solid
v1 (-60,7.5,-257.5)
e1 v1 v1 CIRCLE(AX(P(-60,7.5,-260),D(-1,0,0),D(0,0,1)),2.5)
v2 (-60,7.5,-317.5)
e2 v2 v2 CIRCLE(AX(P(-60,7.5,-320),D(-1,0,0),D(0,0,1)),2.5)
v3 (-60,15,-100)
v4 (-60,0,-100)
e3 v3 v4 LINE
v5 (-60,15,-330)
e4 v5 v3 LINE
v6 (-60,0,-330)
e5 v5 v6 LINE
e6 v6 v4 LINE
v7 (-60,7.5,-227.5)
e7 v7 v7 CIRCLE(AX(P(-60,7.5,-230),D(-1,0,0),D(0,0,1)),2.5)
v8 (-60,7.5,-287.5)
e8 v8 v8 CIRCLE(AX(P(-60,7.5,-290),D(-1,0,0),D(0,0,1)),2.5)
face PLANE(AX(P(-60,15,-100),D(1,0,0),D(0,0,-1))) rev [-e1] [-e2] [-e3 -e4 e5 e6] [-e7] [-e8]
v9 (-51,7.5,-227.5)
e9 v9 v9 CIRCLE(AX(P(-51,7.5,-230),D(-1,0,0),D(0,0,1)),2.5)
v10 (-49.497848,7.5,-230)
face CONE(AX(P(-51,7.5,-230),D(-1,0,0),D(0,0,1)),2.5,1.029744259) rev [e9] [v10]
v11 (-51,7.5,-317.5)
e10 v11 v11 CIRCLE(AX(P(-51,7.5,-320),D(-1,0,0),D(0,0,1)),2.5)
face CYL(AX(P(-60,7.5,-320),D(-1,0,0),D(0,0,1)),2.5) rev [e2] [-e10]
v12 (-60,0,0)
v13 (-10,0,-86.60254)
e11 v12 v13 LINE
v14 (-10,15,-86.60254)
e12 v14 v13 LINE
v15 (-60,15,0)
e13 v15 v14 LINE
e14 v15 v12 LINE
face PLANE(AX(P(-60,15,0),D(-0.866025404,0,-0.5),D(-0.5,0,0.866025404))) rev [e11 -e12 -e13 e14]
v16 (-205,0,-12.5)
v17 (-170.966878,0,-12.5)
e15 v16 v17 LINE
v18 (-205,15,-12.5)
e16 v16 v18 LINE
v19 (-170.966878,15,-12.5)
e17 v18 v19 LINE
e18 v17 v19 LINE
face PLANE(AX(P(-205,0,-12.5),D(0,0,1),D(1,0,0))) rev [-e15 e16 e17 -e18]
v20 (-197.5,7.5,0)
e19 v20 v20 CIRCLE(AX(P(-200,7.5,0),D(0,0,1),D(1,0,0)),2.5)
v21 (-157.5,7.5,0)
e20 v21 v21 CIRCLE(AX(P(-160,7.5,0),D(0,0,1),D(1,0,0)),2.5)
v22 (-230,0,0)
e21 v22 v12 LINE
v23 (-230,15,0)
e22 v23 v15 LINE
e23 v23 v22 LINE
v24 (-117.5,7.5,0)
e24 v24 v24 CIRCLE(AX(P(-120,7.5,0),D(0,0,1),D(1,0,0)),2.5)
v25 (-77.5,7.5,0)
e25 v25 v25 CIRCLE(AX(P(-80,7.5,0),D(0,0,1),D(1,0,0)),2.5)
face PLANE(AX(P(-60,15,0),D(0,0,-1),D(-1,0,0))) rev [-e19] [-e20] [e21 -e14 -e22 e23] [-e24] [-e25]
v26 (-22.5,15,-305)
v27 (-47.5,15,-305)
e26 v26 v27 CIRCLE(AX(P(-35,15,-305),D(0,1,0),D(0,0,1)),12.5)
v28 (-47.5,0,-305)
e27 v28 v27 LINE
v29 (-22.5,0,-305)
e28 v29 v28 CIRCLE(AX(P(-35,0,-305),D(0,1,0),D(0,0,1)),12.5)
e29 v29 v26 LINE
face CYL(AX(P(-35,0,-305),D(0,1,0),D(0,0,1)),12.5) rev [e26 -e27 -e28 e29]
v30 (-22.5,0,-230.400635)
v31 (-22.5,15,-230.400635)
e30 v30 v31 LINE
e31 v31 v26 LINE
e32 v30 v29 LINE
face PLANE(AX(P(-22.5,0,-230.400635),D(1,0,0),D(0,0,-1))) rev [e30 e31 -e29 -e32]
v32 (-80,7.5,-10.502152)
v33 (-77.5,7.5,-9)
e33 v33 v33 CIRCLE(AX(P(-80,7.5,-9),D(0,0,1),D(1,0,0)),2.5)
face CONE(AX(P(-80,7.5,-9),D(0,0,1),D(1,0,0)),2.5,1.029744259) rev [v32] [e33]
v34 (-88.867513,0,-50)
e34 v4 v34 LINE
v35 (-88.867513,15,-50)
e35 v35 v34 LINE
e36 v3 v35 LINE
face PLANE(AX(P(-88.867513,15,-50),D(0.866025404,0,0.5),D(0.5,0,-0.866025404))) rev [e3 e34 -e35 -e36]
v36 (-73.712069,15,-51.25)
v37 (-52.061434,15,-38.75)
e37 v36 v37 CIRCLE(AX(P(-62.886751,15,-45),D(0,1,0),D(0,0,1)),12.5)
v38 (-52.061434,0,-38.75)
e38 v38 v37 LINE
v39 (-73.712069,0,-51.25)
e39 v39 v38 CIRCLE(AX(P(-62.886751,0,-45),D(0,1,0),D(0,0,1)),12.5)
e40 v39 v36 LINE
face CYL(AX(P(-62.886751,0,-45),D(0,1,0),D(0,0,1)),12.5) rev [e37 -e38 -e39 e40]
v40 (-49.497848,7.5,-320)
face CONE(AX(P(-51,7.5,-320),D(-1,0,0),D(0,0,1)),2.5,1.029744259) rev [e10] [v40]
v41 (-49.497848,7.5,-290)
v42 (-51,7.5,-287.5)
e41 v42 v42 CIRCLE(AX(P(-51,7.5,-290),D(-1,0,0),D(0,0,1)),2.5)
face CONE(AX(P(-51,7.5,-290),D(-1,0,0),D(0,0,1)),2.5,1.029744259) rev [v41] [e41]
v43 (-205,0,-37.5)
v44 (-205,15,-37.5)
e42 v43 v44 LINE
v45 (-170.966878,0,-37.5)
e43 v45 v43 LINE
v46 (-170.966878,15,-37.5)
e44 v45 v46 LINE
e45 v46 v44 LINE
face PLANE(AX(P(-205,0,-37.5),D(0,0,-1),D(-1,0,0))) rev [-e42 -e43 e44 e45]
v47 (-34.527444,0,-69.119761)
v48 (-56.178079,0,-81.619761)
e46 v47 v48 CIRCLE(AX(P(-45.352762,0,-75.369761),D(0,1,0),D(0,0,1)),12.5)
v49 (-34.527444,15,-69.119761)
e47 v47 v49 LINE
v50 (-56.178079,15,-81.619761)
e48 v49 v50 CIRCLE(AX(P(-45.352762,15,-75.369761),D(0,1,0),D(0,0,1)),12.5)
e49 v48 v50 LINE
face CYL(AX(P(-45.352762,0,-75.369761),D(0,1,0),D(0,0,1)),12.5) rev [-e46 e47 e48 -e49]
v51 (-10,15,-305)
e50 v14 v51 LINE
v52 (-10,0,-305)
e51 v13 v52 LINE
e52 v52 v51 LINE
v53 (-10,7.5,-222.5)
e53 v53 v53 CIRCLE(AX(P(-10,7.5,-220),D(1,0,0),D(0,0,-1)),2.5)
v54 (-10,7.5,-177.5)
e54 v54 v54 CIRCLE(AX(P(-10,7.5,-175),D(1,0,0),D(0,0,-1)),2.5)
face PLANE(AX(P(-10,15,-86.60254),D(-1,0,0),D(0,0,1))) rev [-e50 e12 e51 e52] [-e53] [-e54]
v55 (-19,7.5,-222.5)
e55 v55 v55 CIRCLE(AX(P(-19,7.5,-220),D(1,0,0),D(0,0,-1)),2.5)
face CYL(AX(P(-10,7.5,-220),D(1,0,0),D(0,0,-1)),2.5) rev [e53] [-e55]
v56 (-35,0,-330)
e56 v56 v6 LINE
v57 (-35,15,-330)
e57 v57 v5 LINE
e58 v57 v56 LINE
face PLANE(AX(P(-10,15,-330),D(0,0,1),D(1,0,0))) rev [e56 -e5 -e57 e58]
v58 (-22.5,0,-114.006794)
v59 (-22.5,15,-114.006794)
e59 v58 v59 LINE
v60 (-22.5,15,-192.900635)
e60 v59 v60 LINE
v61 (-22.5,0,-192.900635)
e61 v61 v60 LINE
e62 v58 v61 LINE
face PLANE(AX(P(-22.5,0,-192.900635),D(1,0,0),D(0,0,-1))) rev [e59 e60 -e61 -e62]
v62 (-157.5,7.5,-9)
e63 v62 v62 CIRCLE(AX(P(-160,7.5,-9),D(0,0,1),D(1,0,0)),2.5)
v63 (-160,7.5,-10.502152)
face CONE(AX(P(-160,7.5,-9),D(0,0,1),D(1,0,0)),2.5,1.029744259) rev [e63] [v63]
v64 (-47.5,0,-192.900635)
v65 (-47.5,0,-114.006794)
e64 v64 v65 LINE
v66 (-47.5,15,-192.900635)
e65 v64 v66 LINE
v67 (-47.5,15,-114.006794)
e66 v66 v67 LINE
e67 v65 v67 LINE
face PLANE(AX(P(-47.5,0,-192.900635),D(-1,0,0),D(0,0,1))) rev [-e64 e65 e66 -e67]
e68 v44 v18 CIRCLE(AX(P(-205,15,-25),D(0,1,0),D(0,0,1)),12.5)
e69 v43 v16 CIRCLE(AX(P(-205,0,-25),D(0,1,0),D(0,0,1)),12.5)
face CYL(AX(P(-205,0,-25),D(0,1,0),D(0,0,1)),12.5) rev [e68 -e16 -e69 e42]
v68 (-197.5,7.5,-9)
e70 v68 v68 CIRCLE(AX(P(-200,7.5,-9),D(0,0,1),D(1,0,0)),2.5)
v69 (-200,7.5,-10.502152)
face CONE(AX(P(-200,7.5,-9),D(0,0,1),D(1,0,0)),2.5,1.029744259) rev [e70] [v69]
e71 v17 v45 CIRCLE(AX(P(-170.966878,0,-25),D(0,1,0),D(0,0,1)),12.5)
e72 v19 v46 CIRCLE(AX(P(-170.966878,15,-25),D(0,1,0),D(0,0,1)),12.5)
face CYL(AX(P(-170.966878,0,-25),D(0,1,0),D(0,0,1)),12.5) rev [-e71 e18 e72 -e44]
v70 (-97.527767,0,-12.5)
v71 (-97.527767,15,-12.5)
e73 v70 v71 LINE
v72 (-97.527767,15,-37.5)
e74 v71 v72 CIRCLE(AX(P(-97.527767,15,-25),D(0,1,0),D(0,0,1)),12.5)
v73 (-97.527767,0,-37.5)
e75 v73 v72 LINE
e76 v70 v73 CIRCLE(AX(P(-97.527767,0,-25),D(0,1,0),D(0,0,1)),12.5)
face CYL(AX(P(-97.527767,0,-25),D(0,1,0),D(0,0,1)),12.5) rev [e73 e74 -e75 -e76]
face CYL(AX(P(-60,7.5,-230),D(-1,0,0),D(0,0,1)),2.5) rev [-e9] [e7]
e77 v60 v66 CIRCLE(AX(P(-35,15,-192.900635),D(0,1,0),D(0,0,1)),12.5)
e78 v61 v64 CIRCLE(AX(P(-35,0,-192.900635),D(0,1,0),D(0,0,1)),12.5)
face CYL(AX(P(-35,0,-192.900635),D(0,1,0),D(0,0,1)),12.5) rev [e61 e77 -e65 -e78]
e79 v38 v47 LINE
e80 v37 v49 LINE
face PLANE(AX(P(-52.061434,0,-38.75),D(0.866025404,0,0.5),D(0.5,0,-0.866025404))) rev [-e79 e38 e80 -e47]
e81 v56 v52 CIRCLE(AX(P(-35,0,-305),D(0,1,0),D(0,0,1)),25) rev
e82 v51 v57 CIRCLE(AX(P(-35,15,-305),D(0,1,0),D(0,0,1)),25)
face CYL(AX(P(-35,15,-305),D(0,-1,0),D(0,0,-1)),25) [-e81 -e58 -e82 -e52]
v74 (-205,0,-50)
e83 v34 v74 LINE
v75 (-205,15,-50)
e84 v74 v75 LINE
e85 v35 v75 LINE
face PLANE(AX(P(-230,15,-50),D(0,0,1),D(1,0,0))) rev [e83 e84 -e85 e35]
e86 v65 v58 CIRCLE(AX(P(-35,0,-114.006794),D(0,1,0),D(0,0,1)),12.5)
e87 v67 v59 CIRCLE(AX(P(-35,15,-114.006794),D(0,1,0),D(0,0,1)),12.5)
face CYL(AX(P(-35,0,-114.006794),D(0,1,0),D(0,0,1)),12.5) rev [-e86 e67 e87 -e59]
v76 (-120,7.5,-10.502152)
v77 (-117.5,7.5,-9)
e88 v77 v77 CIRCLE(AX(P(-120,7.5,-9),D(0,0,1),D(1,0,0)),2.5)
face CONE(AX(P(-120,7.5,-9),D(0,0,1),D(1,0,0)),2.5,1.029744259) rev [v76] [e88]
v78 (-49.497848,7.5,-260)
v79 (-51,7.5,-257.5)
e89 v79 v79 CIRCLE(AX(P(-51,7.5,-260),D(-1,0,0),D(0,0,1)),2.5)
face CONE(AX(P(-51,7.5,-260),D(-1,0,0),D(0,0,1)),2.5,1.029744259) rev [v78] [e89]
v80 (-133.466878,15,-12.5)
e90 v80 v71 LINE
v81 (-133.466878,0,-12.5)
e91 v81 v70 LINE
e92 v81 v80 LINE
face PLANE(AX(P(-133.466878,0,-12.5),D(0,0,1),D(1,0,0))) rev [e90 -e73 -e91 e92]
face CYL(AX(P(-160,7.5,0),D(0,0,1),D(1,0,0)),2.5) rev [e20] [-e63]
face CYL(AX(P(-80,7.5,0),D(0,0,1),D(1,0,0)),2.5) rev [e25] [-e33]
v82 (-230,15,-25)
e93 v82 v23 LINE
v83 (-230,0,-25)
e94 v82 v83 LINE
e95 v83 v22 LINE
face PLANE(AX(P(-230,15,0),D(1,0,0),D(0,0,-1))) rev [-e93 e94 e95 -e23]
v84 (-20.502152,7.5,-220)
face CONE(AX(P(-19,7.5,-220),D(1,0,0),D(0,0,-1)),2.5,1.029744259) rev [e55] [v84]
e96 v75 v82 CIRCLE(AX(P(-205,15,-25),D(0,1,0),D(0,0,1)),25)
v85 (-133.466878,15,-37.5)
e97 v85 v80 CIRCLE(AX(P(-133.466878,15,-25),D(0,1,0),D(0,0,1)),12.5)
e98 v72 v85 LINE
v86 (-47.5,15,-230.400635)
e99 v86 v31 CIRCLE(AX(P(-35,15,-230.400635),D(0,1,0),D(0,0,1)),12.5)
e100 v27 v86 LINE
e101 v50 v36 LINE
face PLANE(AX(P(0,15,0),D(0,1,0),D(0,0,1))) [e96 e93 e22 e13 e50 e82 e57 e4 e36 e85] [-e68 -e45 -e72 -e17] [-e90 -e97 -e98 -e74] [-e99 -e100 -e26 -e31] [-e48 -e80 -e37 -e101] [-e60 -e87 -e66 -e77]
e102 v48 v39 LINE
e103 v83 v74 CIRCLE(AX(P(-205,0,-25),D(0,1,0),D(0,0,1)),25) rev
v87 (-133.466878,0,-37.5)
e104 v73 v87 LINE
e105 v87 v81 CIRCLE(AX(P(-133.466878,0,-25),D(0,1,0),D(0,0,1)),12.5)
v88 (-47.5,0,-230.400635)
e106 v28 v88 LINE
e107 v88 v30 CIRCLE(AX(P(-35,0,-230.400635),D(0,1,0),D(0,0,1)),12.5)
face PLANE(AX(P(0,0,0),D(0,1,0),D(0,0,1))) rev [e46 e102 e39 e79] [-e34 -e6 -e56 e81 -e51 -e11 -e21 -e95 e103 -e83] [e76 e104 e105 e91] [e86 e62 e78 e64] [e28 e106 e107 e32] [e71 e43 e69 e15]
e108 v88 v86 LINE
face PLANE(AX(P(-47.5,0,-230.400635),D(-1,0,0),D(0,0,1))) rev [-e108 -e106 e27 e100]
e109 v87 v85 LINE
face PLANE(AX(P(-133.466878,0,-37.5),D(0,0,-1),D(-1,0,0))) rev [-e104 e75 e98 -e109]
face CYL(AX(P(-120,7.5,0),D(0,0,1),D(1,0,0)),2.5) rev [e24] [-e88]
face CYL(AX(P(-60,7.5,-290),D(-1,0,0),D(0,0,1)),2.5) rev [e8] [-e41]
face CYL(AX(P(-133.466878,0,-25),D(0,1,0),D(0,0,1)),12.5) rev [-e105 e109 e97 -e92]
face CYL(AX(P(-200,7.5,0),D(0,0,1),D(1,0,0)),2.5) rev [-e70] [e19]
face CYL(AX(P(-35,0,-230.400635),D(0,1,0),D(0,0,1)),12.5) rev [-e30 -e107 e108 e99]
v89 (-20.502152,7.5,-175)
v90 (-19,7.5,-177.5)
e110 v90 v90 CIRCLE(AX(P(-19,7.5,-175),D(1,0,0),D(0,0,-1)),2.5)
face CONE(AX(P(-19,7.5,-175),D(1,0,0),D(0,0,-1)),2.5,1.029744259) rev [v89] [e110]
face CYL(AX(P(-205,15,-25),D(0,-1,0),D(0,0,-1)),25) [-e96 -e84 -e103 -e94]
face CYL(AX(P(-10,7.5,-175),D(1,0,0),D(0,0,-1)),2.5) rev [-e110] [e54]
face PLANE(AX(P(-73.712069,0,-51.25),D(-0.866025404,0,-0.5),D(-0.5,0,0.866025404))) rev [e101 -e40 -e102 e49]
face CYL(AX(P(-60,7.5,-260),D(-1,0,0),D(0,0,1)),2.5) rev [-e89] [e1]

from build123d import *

# Parameters (mm, degrees)
BOSS_EXTRUDE1_DEPTH             = 15
CUT_EXTRUDE1_DEPTH              = 403.523291252
FILLET1_R                       = 25
TAP_DRILL_FOR_M6X1_0_TAP1_D     = 5
TAP_DRILL_FOR_M6X1_0_TAP1_DEPTH = 9
TAP_DRILL_FOR_M6X1_0_TAP1_TIP   = 1.502151548
TAP_DRILL_FOR_M6X1_0_TAP2_D     = 5
TAP_DRILL_FOR_M6X1_0_TAP2_DEPTH = 9
TAP_DRILL_FOR_M6X1_0_TAP2_TIP   = 1.502151548


# Read off the part's stored shape, not the designer's step: Tap Drill for M6x1.0 Tap3
with BuildPart() as part:
    # Sketch1 → Boss-Extrude1 (new body)
    with BuildSketch(Plane(origin=(0, 0, 0), x_dir=(1, 0, 0), z_dir=(0, 1, 0))):
        Polygon((-230, 50), (-88.867513459, 50), (-60, 100), (-60, 330), (-10, 330), (-10, 86.602540378), (-60, 0), (-230, 0), align=None)
    extrude(amount=BOSS_EXTRUDE1_DEPTH)

    # Sketch2 → Cut-Extrude1 (cut, through all)
    with BuildSketch(Plane(origin=(0, 15, 0), x_dir=(1, 0, 0), z_dir=(0, 1, 0))):
        with BuildLine():
            Line((-133.466878365, 37.5), (-97.527767497, 37.5))
            ThreePointArc((-97.527767497, 37.5), (-85.027767497, 25), (-97.527767497, 12.5))
            Line((-97.527767497, 12.5), (-133.466878365, 12.5))
            ThreePointArc((-133.466878365, 12.5), (-145.966878365, 25), (-133.466878365, 37.5))
        make_face()
        with BuildLine():
            Line((-73.712068893, 51.25), (-56.178079351, 81.619760746))
            ThreePointArc((-56.178079351, 81.619760746), (-39.102761804, 86.195078293), (-34.527444257, 69.119760746))
            Line((-34.527444257, 69.119760746), (-52.061433799, 38.75))
            ThreePointArc((-52.061433799, 38.75), (-69.136751346, 34.174682453), (-73.712068893, 51.25))
        make_face()
        with BuildLine():
            Line((-22.5, 192.900635095), (-22.5, 114.006793797))
            ThreePointArc((-22.5, 114.006793797), (-35, 101.506793797), (-47.5, 114.006793797))
            Line((-47.5, 114.006793797), (-47.5, 192.900635095))
            ThreePointArc((-47.5, 192.900635095), (-35, 205.400635095), (-22.5, 192.900635095))
        make_face()
        with BuildLine():
            Line((-47.5, 230.400635095), (-47.5, 305))
            ThreePointArc((-47.5, 305), (-35, 317.5), (-22.5, 305))
            Line((-22.5, 305), (-22.5, 230.400635095))
            ThreePointArc((-22.5, 230.400635095), (-35, 217.900635095), (-47.5, 230.400635095))
        make_face()
        with BuildLine():
            Line((-205, 37.5), (-170.966878365, 37.5))
            ThreePointArc((-170.966878365, 37.5), (-158.466878365, 25), (-170.966878365, 12.5))
            Line((-170.966878365, 12.5), (-205, 12.5))
            ThreePointArc((-205, 12.5), (-217.5, 25), (-205, 37.5))
        make_face()
    extrude(amount=-CUT_EXTRUDE1_DEPTH, mode=Mode.SUBTRACT)

    # Fillet1
    fillet1_edges = [part.edges().sort_by_distance(p)[0] for p in [
        (-10, 7.5, -330),
        (-230, 7.5, -50),
    ]]
    fillet(fillet1_edges, radius=FILLET1_R)

    # Tap Drill for M6x1.0 Tap1
    with Locations(Plane.XY):
        with Locations((-80, 7.5), (-200, 7.5), (-160, 7.5), (-120, 7.5)):
            Hole(TAP_DRILL_FOR_M6X1_0_TAP1_D / 2, depth=TAP_DRILL_FOR_M6X1_0_TAP1_DEPTH)
            with Locations((0, 0, -(TAP_DRILL_FOR_M6X1_0_TAP1_DEPTH + TAP_DRILL_FOR_M6X1_0_TAP1_TIP / 2))):  # 118° drill point
                Cone(0, TAP_DRILL_FOR_M6X1_0_TAP1_D / 2, TAP_DRILL_FOR_M6X1_0_TAP1_TIP, mode=Mode.SUBTRACT)

    # Tap Drill for M6x1.0 Tap2
    with Locations(Plane.ZY.offset(60)):
        with Locations((-230, 7.5), (-320, 7.5), (-290, 7.5), (-260, 7.5)):
            Hole(TAP_DRILL_FOR_M6X1_0_TAP2_D / 2, depth=TAP_DRILL_FOR_M6X1_0_TAP2_DEPTH)
            with Locations((0, 0, -(TAP_DRILL_FOR_M6X1_0_TAP2_DEPTH + TAP_DRILL_FOR_M6X1_0_TAP2_TIP / 2))):  # 118° drill point
                Cone(0, TAP_DRILL_FOR_M6X1_0_TAP2_D / 2, TAP_DRILL_FOR_M6X1_0_TAP2_TIP, mode=Mode.SUBTRACT)

    # Tap Drill for M6x1.0 Tap3 outline → Tap Drill for M6x1.0 Tap3 (revolve, cut)
    with BuildSketch(Plane(origin=(0, 7.5, -175), x_dir=(0, 1, 0), z_dir=(0, 0, -1))):
        Polygon((0, -10), (0, -20.502151548), (2.5, -19), (2.5, -10), align=None)
    revolve(axis=Axis((0, 7.5, -175), (1, 0, 0)), mode=Mode.SUBTRACT)

    # Tap Drill for M6x1.0 Tap3 2 outline → Tap Drill for M6x1.0 Tap3 2 (revolve, cut)
    with BuildSketch(Plane(origin=(0, 7.5, -220), x_dir=(0, 1, 0), z_dir=(0, 0, -1))):
        Polygon((0, -10), (0, -20.502151548), (2.5, -19), (2.5, -10), align=None)
    revolve(axis=Axis((0, 7.5, -220), (1, 0, 0)), mode=Mode.SUBTRACT)


solid = part.part
